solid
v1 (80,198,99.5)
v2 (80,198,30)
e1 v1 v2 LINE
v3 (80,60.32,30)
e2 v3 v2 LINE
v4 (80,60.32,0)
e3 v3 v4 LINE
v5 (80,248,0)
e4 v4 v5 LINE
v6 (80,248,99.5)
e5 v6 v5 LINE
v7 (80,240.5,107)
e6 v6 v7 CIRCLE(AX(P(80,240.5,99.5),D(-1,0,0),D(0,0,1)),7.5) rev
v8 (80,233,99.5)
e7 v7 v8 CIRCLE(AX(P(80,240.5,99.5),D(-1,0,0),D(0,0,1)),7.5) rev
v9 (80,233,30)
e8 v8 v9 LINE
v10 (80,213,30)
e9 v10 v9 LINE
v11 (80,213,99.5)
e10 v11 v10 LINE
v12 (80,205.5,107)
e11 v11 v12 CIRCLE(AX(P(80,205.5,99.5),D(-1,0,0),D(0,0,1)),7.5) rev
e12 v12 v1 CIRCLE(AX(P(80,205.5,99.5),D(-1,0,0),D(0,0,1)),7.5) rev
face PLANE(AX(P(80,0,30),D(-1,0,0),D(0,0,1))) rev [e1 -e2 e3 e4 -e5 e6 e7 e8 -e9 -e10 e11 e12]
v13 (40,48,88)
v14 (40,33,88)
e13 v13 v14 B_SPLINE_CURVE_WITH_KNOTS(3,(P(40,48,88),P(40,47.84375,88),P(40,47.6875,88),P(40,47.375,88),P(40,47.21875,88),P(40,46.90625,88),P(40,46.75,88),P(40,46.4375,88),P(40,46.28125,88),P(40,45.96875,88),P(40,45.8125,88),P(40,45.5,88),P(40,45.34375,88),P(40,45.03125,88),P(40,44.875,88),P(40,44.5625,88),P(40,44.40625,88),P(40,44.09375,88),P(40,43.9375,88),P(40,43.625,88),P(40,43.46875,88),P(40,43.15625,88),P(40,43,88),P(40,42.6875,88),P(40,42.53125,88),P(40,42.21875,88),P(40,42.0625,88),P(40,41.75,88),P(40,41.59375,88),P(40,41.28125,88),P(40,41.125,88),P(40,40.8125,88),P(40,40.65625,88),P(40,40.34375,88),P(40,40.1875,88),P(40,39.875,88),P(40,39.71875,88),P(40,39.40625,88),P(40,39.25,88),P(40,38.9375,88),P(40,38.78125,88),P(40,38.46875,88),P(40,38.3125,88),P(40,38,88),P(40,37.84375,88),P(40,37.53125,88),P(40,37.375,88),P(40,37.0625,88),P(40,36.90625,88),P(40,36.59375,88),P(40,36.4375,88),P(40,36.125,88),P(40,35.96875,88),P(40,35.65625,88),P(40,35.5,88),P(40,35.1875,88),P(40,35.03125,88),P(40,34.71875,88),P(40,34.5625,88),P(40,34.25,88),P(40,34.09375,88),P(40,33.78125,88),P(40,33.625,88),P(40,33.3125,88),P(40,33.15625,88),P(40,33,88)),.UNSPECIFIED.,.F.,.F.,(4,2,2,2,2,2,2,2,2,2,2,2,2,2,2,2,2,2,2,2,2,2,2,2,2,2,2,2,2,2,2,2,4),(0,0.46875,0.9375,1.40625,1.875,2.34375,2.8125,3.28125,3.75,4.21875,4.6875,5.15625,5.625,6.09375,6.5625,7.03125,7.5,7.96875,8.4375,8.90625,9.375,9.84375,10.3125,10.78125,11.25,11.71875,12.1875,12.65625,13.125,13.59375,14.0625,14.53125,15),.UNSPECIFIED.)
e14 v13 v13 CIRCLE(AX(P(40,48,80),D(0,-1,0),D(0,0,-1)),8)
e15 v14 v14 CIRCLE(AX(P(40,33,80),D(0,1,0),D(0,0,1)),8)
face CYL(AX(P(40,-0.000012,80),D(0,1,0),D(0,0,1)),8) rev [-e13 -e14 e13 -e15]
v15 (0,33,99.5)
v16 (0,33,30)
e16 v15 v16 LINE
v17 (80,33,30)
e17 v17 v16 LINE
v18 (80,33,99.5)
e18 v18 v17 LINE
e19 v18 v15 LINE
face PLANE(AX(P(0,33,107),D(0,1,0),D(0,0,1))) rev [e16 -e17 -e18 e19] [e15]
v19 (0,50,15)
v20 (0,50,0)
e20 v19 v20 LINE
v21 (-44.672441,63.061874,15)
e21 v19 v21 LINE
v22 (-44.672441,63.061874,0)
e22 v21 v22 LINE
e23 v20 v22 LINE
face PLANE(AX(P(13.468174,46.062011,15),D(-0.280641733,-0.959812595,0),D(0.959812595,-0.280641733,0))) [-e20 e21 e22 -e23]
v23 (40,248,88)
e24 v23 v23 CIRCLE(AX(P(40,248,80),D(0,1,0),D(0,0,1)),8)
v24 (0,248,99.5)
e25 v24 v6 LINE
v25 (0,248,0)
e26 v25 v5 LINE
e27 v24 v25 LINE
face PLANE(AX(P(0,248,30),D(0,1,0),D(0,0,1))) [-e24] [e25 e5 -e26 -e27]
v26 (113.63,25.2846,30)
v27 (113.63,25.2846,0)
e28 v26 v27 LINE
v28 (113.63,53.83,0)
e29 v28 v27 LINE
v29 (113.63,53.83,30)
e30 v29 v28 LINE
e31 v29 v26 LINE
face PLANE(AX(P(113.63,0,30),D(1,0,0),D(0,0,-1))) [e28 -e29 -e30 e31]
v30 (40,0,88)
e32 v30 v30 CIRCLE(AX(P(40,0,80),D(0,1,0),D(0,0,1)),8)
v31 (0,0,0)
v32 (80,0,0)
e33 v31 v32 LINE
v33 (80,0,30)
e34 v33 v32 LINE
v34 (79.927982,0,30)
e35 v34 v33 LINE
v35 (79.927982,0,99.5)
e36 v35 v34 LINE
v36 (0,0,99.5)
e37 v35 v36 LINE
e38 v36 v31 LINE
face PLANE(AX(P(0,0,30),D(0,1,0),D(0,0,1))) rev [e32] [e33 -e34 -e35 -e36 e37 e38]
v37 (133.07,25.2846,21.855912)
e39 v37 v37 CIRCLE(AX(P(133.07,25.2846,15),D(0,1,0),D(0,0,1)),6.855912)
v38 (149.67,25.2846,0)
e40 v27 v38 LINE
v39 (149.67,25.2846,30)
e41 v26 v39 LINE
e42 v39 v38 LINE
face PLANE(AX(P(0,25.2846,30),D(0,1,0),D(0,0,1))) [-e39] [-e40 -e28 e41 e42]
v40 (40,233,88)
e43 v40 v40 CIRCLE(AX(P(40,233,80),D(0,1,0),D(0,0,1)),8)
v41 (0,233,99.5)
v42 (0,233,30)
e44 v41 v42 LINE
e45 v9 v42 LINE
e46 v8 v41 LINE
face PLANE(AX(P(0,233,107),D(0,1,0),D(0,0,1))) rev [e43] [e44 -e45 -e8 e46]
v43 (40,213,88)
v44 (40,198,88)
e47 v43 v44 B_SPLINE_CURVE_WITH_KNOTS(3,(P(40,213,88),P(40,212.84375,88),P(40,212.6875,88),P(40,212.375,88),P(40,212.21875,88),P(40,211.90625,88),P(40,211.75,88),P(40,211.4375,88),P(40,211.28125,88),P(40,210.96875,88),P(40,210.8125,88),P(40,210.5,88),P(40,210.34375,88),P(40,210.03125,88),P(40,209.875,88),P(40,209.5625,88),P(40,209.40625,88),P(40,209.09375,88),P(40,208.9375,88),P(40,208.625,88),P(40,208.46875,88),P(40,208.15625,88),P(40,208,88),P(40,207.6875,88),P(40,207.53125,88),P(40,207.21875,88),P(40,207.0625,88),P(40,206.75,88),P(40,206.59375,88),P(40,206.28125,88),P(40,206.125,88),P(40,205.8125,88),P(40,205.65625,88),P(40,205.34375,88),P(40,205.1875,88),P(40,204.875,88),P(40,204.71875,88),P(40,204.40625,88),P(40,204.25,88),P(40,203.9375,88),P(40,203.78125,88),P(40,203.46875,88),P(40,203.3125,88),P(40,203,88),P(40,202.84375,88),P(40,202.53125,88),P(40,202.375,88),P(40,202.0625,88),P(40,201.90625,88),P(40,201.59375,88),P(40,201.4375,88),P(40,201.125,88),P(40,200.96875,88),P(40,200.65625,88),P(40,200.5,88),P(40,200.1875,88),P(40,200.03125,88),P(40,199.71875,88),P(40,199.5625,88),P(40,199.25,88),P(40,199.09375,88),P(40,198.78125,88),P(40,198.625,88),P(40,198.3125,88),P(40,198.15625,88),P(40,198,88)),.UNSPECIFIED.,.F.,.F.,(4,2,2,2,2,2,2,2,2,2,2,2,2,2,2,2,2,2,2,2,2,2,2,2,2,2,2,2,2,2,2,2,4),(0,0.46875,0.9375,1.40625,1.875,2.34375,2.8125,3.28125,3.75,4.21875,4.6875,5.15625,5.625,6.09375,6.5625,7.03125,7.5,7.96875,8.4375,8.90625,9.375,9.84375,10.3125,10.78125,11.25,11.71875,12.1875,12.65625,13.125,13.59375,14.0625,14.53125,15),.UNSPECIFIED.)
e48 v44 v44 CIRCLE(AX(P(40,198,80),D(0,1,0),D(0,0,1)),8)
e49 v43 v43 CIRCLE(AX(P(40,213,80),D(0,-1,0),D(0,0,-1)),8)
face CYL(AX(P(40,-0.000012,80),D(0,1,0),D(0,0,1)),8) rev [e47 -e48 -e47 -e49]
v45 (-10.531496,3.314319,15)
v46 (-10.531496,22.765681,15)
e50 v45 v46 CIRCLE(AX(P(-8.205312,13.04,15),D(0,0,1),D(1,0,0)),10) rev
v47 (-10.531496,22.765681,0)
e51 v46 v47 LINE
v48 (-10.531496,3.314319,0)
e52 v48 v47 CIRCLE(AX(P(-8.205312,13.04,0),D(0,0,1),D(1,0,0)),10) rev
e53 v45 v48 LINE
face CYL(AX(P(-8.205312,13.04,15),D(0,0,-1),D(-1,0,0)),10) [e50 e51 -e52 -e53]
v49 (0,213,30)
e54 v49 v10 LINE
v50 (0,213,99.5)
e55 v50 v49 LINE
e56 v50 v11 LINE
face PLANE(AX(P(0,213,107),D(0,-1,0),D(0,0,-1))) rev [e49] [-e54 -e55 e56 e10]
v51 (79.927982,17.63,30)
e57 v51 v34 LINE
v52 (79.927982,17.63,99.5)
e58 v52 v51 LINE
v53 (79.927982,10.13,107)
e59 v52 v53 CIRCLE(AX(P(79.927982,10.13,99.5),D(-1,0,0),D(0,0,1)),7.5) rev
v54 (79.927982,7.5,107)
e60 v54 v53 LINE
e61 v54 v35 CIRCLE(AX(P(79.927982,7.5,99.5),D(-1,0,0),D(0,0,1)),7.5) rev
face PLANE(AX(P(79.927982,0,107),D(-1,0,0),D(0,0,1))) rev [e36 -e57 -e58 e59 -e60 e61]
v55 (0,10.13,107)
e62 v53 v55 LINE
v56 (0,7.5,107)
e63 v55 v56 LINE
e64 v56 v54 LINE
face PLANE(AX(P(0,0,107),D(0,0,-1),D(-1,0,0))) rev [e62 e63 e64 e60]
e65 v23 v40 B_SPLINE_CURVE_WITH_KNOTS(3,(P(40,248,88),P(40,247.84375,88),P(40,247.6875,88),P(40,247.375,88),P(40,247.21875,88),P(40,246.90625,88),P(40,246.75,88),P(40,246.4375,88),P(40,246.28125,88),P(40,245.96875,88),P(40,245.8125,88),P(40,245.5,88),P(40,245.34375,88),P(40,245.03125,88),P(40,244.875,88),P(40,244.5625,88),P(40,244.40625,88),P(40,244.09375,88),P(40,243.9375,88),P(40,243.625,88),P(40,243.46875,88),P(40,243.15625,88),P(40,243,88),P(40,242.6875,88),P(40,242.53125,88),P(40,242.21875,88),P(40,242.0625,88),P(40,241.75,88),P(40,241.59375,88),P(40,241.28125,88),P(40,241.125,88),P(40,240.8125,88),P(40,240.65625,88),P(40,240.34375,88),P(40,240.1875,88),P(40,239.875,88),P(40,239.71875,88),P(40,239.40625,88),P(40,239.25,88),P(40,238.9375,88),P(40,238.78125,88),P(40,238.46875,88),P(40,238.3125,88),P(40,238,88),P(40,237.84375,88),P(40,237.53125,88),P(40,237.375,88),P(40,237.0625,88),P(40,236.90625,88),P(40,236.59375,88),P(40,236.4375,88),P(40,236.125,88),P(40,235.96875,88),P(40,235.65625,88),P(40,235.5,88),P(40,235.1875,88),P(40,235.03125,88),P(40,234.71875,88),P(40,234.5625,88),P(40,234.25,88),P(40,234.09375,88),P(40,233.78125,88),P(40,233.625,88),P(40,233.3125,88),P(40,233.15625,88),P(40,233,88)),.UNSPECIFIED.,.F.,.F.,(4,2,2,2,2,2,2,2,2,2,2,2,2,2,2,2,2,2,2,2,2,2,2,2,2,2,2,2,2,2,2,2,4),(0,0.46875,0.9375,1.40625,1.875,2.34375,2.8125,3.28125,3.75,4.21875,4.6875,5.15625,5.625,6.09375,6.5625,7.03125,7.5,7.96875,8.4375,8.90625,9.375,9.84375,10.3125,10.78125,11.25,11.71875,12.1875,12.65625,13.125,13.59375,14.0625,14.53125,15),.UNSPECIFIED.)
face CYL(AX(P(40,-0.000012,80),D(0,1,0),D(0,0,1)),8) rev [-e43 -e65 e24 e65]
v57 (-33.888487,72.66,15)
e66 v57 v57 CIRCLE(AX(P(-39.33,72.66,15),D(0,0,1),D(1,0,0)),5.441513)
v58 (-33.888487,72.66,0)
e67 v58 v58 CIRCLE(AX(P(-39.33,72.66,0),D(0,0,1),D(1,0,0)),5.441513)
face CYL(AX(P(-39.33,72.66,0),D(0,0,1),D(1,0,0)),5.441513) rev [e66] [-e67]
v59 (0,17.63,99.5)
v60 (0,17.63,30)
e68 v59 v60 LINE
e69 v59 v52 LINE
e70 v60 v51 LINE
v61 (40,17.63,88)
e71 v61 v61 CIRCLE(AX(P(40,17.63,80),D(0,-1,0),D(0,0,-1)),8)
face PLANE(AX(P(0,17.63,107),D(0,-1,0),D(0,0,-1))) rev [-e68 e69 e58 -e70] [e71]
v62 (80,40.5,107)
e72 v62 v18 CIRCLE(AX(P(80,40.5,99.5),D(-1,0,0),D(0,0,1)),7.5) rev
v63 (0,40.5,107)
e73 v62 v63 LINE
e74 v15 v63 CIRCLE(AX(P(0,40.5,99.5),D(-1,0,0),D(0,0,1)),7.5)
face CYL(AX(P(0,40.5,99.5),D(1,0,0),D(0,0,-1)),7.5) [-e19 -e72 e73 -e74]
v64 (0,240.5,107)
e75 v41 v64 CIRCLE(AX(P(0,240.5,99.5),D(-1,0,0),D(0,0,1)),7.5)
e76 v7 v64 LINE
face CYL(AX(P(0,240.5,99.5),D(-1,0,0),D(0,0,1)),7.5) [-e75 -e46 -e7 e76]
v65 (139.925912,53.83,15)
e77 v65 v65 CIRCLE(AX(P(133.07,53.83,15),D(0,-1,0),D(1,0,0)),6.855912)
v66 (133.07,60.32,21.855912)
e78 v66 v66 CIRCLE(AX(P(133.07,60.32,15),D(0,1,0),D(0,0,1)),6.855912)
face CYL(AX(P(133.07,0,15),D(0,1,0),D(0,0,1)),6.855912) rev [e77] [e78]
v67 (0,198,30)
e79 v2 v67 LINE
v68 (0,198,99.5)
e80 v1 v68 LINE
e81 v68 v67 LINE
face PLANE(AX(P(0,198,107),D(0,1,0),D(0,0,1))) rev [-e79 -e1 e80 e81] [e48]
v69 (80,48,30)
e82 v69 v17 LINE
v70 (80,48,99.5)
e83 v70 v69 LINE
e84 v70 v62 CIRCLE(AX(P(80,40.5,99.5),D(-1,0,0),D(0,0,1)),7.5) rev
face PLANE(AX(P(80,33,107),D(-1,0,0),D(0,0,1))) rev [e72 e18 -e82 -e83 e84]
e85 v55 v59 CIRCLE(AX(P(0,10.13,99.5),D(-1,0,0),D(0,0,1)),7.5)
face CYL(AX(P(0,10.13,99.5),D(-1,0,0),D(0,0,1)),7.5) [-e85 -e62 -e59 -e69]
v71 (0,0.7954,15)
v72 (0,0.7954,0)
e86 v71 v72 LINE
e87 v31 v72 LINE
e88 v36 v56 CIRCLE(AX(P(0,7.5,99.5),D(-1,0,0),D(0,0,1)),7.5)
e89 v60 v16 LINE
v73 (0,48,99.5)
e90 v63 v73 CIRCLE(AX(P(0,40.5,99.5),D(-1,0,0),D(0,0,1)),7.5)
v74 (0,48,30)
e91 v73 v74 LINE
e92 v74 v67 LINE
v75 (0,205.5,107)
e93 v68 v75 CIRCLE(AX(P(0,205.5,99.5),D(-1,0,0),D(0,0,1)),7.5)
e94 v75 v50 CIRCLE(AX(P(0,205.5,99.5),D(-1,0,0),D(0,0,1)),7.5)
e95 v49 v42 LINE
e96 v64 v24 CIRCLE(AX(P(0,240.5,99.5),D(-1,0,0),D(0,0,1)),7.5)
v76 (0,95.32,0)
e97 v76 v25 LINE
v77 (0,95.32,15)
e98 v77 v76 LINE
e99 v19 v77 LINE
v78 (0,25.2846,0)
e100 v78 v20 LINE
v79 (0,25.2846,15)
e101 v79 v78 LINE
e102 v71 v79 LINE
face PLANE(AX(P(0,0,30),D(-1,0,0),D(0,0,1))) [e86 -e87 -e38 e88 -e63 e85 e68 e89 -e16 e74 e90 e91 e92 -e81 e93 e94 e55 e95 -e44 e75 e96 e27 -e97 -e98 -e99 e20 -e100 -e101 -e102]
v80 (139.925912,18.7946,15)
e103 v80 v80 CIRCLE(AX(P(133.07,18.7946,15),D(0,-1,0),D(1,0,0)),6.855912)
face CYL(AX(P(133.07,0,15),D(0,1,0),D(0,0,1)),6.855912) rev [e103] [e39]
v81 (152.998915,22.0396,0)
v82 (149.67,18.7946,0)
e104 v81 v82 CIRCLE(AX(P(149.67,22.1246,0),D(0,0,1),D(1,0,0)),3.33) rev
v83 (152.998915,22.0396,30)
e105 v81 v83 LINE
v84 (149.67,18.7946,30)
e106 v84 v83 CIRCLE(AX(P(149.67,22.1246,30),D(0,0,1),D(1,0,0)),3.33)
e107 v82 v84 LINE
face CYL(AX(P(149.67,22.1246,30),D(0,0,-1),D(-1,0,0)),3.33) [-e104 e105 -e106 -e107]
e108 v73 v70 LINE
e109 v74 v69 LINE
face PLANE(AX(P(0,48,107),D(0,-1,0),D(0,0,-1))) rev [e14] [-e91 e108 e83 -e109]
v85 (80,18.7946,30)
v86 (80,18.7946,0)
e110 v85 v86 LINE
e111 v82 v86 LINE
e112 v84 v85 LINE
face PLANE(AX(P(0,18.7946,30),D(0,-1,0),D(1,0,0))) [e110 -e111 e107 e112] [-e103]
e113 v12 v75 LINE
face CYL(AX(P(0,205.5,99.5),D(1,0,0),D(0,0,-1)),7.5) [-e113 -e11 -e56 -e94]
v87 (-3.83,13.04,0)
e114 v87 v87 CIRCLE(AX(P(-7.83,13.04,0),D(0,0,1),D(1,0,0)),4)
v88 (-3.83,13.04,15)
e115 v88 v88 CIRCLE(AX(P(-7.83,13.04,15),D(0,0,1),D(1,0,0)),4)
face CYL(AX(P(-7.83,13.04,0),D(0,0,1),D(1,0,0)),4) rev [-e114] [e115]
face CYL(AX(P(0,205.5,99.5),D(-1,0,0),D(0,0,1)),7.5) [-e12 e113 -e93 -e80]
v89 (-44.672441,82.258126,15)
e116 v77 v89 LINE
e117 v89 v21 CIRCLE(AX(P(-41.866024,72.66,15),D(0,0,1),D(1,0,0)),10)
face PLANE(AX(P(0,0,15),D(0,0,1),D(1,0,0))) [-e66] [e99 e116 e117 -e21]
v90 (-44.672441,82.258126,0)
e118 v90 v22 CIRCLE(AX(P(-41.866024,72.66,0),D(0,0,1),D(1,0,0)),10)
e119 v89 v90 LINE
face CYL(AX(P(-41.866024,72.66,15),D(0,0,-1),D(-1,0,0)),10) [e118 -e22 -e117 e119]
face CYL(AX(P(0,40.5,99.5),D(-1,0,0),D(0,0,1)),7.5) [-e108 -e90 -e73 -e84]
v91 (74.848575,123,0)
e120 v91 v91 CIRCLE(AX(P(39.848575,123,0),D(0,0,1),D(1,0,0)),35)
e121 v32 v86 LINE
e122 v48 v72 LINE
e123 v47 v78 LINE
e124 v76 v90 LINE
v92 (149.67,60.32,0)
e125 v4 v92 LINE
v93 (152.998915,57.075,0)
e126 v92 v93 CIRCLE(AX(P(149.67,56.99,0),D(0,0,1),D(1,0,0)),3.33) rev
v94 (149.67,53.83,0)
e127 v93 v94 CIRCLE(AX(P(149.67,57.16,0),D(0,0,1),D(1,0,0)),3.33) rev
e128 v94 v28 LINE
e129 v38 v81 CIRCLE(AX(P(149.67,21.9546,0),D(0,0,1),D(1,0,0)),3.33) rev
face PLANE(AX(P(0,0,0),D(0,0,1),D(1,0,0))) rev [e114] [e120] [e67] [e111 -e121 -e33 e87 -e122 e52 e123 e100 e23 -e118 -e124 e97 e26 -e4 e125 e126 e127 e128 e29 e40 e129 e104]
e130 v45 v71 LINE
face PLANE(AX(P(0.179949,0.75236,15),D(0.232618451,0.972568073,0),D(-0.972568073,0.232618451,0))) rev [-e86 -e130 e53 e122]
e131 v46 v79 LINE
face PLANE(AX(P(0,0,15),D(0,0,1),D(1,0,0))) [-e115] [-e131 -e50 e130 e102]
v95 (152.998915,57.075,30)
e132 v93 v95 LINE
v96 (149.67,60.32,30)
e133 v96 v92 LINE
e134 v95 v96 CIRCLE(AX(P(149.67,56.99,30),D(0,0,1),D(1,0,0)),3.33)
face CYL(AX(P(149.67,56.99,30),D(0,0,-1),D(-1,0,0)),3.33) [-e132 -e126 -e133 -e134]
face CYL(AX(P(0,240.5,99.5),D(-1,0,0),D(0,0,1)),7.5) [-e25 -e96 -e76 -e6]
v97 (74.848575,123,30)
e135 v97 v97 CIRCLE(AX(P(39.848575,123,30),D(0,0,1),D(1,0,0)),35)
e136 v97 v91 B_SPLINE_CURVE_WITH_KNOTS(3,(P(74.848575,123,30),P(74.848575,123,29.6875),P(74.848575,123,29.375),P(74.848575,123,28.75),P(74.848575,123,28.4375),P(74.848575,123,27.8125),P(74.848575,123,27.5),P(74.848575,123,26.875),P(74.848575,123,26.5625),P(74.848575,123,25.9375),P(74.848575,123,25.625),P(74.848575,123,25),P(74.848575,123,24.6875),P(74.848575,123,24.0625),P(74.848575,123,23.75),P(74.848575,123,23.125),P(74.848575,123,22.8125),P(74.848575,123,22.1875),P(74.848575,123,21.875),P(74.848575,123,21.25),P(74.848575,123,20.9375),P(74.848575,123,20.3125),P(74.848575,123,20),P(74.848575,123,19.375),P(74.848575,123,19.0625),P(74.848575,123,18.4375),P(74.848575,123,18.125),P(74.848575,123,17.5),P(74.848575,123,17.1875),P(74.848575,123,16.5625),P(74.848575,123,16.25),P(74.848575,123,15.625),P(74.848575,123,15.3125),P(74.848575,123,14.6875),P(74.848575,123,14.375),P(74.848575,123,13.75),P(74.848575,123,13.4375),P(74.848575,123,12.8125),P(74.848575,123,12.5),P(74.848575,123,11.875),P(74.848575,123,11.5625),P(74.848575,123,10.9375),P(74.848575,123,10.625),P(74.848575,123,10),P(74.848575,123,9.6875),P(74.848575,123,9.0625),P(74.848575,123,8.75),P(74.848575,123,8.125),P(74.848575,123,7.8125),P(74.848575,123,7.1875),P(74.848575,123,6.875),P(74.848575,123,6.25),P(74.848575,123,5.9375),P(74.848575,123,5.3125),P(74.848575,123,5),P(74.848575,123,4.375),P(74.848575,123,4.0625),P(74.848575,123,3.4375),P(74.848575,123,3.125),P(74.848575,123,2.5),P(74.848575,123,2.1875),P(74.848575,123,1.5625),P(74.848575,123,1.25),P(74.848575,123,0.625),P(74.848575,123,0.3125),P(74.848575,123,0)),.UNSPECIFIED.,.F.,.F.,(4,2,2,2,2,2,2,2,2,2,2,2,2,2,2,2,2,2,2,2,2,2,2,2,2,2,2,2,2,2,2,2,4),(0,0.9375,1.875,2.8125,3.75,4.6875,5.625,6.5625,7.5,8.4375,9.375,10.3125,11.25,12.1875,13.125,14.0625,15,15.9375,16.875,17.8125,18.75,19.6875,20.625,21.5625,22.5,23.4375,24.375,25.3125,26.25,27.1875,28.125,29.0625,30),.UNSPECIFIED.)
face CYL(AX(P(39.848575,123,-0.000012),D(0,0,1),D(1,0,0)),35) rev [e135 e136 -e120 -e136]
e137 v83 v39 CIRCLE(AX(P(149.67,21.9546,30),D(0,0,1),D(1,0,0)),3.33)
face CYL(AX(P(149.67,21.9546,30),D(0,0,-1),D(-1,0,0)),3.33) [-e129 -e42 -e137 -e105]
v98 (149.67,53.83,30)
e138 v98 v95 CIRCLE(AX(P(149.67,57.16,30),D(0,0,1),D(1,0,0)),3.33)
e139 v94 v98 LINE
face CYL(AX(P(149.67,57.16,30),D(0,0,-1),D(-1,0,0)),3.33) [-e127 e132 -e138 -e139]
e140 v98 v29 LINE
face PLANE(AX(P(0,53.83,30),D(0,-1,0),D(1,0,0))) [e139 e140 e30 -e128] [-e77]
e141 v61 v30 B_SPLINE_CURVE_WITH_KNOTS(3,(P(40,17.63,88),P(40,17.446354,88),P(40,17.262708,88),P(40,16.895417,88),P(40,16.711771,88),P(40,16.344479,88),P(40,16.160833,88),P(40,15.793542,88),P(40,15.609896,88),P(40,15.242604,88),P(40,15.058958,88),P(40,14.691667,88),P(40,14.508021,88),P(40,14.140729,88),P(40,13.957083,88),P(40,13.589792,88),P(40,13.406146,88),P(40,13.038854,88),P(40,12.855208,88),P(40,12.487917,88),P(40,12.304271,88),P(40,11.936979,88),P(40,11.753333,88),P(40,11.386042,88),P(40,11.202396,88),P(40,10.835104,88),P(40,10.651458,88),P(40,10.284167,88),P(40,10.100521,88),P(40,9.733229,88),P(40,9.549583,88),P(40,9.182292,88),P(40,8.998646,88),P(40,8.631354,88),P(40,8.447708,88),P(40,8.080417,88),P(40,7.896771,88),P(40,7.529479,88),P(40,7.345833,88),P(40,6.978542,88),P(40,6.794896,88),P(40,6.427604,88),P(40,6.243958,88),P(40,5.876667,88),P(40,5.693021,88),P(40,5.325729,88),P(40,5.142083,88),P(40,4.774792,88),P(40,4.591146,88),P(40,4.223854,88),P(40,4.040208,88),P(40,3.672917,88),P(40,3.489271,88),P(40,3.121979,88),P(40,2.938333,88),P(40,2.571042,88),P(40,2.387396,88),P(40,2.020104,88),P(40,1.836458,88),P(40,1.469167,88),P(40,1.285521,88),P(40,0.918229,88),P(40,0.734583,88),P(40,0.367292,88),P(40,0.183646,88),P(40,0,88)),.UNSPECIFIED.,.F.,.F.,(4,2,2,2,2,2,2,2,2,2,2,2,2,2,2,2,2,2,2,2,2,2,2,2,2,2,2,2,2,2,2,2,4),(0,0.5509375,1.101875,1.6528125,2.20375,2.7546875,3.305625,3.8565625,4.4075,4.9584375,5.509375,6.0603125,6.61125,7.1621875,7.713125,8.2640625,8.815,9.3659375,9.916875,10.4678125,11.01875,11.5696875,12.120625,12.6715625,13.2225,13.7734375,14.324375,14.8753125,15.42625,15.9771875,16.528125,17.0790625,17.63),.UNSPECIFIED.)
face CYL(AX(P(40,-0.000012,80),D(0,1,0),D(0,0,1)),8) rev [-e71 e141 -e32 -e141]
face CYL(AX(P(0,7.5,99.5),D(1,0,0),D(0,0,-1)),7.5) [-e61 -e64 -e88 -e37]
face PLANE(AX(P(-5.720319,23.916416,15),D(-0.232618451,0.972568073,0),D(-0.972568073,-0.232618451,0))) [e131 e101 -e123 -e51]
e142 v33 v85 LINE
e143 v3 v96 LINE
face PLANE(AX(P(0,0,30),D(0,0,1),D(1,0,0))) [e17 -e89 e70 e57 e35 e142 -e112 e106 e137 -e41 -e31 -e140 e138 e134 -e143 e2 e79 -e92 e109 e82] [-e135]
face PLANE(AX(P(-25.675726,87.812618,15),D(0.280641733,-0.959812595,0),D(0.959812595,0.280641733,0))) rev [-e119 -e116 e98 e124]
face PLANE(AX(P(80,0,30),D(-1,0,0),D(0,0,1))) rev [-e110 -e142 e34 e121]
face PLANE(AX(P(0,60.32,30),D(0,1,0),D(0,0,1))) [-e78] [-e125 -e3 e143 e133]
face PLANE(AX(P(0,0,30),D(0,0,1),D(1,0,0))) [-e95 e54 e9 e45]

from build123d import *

# Parameters (mm, degrees)
SKETCH2_W               = 80
SKETCH2_H               = 248
BOSS_EXTRUDE1_DEPTH     = 30
BOSS_EXTRUDE2_DEPTH     = 15
SKETCH3_W               = 80
SKETCH3_H               = 15
SKETCH3_W_2             = 79.927982428
SKETCH3_H_2             = 17.63
BOSS_EXTRUDE3_DEPTH     = 107
FILLET1_R               = 7.5
FILLET2_R               = 3.33
CUT_EXTRUDE1_DEPTH      = 311.421758238
CUT_EXTRUDE1_DEPTH_BACK = 311.421758238
SKETCH4_R               = 35
CUT_EXTRUDE2_DEPTH      = 311.421758238
CUT_EXTRUDE2_DEPTH_BACK = 311.421758238
SKETCH5_R               = 8
SKETCH6_R               = 6.855911781
CUT_EXTRUDE3_DEPTH      = 265.72901312
SKETCH7_R               = 5.441513082
CUT_EXTRUDE4_DEPTH      = 306.575961076
SKETCH8_R               = 4
CUT_EXTRUDE5_DEPTH      = 306.575961076


# Some blends are built 0.0001 mm under size
with BuildPart() as part:
    # Sketch2 → Boss-Extrude1 (new body)
    with BuildSketch(Plane.XY):
        with Locations((40, 124)):
            Rectangle(SKETCH2_W, SKETCH2_H)
        Polygon((153, 60.32), (80, 60.32), (80, 18.794599866), (153, 18.794599866), (153, 25.284599866), (113.63, 25.284599866), (113.63, 53.83), (153, 53.83), align=None)
    extrude(amount=BOSS_EXTRUDE1_DEPTH)

    # Sketch2<5> → Boss-Extrude2 (add)
    with BuildSketch(Plane.XY):
        with BuildLine():
            Line((0, 50), (0, 95.32))
            Line((0, 95.32), (-44.67244089, 82.258125951))
            ThreePointArc((-44.67244089, 82.258125951), (-51.866023561, 72.66), (-44.67244089, 63.061874049))
            Line((-44.67244089, 63.061874049), (0, 50))
        make_face()
        with BuildLine():
            Line((-10.531496207, 3.314319271), (0, 0.795400134))
            Line((0, 0.795400134), (0, 25.284599866))
            Line((0, 25.284599866), (-10.531496207, 22.765680729))
            ThreePointArc((-10.531496207, 22.765680729), (-18.205311701, 13.04), (-10.531496207, 3.314319271))
        make_face()
    extrude(amount=BOSS_EXTRUDE2_DEPTH)

    # Sketch3 → Boss-Extrude3 (add)
    with BuildSketch(Plane.XY):
        with Locations((40, 240.5)):
            Rectangle(SKETCH3_W, SKETCH3_H)
        with Locations((40, 205.5)):
            Rectangle(SKETCH3_W, SKETCH3_H)
        with Locations((40, 40.5)):
            Rectangle(SKETCH3_W, SKETCH3_H)
        with Locations((39.963991214, 8.815)):
            Rectangle(SKETCH3_W_2, SKETCH3_H_2)
    extrude(amount=BOSS_EXTRUDE3_DEPTH)

    # Fillet1
    fillet1_edges = [part.edges().sort_by_distance(p)[0] for p in [
        (39.963991214, 0, 107),
        (39.963991214, 17.63, 107),
        (40, 33, 107),
        (40, 48, 107),
        (40, 198, 107),
        (40, 213, 107),
        (40, 233, 107),
        (40, 248, 107),
    ]]
    fillet(fillet1_edges, radius=FILLET1_R - 0.0001)  # a hair under: the kernel refuses the full size

    # Fillet2
    # the kernel refuses this fillet: 3.33 mm, written as the material it takes off along each edge
    with BuildSketch(Plane(origin=(153, 18.794599866, -8.325), x_dir=(-1, 0, 0), z_dir=(0, 0, 1)), Plane(origin=(153, 25.284599866, -8.325), x_dir=(0, -1, 0), z_dir=(0, 0, 1)), Plane(origin=(153, 53.83, -8.325), x_dir=(-1, 0, 0), z_dir=(0, 0, 1)), Plane(origin=(153, 60.32, -8.325), x_dir=(0, -1, 0), z_dir=(0, 0, 1))) as fillet2_piece_1:
        with BuildLine():
            CenterArc((FILLET2_R, -FILLET2_R), FILLET2_R, 90, 90)
            Line((0, -FILLET2_R), (0, 0))
            Line((0, 0), (FILLET2_R, 0))
        make_face()
    extrude(amount=46.65, mode=Mode.SUBTRACT)

    # Sketch4 → Cut-Extrude1 (cut, two sides: drawn at the far end of the back side and taken through both)
    with BuildSketch(Plane.XY.offset(-CUT_EXTRUDE1_DEPTH_BACK)):
        with Locations((39.848575035, 123)):
            Circle(SKETCH4_R)
    extrude(amount=CUT_EXTRUDE1_DEPTH + CUT_EXTRUDE1_DEPTH_BACK, mode=Mode.SUBTRACT)

    # Sketch5 → Cut-Extrude2 (cut, two sides: drawn at the far end of the back side and taken through both)
    with BuildSketch(Plane(origin=(0, 0, 0), x_dir=(1, 0, 0), z_dir=(0, 1, 0)).offset(-CUT_EXTRUDE2_DEPTH_BACK)):
        with Locations(Location((40, -80, 0), (0, 0, 270))):
            Circle(SKETCH5_R)
    extrude(amount=CUT_EXTRUDE2_DEPTH + CUT_EXTRUDE2_DEPTH_BACK, mode=Mode.SUBTRACT)

    # Sketch6 → Cut-Extrude3 (cut, through all)
    with BuildSketch(Plane(origin=(0, 60.32, 0), x_dir=(1, 0, 0), z_dir=(0, 1, 0))):
        with Locations(Location((133.07, -15, 0), (0, 0, 270))):
            Circle(SKETCH6_R)
    extrude(amount=-CUT_EXTRUDE3_DEPTH, mode=Mode.SUBTRACT)

    # Sketch7 → Cut-Extrude4 (cut, through all)
    with BuildSketch(Plane.XY.offset(15)):
        with Locations((-39.33, 72.66)):
            Circle(SKETCH7_R)
    extrude(amount=-CUT_EXTRUDE4_DEPTH, mode=Mode.SUBTRACT)

    # Sketch8 → Cut-Extrude5 (cut, through all)
    with BuildSketch(Plane.XY.offset(15)):
        with Locations((-7.83, 13.04)):
            Circle(SKETCH8_R)
    extrude(amount=-CUT_EXTRUDE5_DEPTH, mode=Mode.SUBTRACT)


solid = part.part
